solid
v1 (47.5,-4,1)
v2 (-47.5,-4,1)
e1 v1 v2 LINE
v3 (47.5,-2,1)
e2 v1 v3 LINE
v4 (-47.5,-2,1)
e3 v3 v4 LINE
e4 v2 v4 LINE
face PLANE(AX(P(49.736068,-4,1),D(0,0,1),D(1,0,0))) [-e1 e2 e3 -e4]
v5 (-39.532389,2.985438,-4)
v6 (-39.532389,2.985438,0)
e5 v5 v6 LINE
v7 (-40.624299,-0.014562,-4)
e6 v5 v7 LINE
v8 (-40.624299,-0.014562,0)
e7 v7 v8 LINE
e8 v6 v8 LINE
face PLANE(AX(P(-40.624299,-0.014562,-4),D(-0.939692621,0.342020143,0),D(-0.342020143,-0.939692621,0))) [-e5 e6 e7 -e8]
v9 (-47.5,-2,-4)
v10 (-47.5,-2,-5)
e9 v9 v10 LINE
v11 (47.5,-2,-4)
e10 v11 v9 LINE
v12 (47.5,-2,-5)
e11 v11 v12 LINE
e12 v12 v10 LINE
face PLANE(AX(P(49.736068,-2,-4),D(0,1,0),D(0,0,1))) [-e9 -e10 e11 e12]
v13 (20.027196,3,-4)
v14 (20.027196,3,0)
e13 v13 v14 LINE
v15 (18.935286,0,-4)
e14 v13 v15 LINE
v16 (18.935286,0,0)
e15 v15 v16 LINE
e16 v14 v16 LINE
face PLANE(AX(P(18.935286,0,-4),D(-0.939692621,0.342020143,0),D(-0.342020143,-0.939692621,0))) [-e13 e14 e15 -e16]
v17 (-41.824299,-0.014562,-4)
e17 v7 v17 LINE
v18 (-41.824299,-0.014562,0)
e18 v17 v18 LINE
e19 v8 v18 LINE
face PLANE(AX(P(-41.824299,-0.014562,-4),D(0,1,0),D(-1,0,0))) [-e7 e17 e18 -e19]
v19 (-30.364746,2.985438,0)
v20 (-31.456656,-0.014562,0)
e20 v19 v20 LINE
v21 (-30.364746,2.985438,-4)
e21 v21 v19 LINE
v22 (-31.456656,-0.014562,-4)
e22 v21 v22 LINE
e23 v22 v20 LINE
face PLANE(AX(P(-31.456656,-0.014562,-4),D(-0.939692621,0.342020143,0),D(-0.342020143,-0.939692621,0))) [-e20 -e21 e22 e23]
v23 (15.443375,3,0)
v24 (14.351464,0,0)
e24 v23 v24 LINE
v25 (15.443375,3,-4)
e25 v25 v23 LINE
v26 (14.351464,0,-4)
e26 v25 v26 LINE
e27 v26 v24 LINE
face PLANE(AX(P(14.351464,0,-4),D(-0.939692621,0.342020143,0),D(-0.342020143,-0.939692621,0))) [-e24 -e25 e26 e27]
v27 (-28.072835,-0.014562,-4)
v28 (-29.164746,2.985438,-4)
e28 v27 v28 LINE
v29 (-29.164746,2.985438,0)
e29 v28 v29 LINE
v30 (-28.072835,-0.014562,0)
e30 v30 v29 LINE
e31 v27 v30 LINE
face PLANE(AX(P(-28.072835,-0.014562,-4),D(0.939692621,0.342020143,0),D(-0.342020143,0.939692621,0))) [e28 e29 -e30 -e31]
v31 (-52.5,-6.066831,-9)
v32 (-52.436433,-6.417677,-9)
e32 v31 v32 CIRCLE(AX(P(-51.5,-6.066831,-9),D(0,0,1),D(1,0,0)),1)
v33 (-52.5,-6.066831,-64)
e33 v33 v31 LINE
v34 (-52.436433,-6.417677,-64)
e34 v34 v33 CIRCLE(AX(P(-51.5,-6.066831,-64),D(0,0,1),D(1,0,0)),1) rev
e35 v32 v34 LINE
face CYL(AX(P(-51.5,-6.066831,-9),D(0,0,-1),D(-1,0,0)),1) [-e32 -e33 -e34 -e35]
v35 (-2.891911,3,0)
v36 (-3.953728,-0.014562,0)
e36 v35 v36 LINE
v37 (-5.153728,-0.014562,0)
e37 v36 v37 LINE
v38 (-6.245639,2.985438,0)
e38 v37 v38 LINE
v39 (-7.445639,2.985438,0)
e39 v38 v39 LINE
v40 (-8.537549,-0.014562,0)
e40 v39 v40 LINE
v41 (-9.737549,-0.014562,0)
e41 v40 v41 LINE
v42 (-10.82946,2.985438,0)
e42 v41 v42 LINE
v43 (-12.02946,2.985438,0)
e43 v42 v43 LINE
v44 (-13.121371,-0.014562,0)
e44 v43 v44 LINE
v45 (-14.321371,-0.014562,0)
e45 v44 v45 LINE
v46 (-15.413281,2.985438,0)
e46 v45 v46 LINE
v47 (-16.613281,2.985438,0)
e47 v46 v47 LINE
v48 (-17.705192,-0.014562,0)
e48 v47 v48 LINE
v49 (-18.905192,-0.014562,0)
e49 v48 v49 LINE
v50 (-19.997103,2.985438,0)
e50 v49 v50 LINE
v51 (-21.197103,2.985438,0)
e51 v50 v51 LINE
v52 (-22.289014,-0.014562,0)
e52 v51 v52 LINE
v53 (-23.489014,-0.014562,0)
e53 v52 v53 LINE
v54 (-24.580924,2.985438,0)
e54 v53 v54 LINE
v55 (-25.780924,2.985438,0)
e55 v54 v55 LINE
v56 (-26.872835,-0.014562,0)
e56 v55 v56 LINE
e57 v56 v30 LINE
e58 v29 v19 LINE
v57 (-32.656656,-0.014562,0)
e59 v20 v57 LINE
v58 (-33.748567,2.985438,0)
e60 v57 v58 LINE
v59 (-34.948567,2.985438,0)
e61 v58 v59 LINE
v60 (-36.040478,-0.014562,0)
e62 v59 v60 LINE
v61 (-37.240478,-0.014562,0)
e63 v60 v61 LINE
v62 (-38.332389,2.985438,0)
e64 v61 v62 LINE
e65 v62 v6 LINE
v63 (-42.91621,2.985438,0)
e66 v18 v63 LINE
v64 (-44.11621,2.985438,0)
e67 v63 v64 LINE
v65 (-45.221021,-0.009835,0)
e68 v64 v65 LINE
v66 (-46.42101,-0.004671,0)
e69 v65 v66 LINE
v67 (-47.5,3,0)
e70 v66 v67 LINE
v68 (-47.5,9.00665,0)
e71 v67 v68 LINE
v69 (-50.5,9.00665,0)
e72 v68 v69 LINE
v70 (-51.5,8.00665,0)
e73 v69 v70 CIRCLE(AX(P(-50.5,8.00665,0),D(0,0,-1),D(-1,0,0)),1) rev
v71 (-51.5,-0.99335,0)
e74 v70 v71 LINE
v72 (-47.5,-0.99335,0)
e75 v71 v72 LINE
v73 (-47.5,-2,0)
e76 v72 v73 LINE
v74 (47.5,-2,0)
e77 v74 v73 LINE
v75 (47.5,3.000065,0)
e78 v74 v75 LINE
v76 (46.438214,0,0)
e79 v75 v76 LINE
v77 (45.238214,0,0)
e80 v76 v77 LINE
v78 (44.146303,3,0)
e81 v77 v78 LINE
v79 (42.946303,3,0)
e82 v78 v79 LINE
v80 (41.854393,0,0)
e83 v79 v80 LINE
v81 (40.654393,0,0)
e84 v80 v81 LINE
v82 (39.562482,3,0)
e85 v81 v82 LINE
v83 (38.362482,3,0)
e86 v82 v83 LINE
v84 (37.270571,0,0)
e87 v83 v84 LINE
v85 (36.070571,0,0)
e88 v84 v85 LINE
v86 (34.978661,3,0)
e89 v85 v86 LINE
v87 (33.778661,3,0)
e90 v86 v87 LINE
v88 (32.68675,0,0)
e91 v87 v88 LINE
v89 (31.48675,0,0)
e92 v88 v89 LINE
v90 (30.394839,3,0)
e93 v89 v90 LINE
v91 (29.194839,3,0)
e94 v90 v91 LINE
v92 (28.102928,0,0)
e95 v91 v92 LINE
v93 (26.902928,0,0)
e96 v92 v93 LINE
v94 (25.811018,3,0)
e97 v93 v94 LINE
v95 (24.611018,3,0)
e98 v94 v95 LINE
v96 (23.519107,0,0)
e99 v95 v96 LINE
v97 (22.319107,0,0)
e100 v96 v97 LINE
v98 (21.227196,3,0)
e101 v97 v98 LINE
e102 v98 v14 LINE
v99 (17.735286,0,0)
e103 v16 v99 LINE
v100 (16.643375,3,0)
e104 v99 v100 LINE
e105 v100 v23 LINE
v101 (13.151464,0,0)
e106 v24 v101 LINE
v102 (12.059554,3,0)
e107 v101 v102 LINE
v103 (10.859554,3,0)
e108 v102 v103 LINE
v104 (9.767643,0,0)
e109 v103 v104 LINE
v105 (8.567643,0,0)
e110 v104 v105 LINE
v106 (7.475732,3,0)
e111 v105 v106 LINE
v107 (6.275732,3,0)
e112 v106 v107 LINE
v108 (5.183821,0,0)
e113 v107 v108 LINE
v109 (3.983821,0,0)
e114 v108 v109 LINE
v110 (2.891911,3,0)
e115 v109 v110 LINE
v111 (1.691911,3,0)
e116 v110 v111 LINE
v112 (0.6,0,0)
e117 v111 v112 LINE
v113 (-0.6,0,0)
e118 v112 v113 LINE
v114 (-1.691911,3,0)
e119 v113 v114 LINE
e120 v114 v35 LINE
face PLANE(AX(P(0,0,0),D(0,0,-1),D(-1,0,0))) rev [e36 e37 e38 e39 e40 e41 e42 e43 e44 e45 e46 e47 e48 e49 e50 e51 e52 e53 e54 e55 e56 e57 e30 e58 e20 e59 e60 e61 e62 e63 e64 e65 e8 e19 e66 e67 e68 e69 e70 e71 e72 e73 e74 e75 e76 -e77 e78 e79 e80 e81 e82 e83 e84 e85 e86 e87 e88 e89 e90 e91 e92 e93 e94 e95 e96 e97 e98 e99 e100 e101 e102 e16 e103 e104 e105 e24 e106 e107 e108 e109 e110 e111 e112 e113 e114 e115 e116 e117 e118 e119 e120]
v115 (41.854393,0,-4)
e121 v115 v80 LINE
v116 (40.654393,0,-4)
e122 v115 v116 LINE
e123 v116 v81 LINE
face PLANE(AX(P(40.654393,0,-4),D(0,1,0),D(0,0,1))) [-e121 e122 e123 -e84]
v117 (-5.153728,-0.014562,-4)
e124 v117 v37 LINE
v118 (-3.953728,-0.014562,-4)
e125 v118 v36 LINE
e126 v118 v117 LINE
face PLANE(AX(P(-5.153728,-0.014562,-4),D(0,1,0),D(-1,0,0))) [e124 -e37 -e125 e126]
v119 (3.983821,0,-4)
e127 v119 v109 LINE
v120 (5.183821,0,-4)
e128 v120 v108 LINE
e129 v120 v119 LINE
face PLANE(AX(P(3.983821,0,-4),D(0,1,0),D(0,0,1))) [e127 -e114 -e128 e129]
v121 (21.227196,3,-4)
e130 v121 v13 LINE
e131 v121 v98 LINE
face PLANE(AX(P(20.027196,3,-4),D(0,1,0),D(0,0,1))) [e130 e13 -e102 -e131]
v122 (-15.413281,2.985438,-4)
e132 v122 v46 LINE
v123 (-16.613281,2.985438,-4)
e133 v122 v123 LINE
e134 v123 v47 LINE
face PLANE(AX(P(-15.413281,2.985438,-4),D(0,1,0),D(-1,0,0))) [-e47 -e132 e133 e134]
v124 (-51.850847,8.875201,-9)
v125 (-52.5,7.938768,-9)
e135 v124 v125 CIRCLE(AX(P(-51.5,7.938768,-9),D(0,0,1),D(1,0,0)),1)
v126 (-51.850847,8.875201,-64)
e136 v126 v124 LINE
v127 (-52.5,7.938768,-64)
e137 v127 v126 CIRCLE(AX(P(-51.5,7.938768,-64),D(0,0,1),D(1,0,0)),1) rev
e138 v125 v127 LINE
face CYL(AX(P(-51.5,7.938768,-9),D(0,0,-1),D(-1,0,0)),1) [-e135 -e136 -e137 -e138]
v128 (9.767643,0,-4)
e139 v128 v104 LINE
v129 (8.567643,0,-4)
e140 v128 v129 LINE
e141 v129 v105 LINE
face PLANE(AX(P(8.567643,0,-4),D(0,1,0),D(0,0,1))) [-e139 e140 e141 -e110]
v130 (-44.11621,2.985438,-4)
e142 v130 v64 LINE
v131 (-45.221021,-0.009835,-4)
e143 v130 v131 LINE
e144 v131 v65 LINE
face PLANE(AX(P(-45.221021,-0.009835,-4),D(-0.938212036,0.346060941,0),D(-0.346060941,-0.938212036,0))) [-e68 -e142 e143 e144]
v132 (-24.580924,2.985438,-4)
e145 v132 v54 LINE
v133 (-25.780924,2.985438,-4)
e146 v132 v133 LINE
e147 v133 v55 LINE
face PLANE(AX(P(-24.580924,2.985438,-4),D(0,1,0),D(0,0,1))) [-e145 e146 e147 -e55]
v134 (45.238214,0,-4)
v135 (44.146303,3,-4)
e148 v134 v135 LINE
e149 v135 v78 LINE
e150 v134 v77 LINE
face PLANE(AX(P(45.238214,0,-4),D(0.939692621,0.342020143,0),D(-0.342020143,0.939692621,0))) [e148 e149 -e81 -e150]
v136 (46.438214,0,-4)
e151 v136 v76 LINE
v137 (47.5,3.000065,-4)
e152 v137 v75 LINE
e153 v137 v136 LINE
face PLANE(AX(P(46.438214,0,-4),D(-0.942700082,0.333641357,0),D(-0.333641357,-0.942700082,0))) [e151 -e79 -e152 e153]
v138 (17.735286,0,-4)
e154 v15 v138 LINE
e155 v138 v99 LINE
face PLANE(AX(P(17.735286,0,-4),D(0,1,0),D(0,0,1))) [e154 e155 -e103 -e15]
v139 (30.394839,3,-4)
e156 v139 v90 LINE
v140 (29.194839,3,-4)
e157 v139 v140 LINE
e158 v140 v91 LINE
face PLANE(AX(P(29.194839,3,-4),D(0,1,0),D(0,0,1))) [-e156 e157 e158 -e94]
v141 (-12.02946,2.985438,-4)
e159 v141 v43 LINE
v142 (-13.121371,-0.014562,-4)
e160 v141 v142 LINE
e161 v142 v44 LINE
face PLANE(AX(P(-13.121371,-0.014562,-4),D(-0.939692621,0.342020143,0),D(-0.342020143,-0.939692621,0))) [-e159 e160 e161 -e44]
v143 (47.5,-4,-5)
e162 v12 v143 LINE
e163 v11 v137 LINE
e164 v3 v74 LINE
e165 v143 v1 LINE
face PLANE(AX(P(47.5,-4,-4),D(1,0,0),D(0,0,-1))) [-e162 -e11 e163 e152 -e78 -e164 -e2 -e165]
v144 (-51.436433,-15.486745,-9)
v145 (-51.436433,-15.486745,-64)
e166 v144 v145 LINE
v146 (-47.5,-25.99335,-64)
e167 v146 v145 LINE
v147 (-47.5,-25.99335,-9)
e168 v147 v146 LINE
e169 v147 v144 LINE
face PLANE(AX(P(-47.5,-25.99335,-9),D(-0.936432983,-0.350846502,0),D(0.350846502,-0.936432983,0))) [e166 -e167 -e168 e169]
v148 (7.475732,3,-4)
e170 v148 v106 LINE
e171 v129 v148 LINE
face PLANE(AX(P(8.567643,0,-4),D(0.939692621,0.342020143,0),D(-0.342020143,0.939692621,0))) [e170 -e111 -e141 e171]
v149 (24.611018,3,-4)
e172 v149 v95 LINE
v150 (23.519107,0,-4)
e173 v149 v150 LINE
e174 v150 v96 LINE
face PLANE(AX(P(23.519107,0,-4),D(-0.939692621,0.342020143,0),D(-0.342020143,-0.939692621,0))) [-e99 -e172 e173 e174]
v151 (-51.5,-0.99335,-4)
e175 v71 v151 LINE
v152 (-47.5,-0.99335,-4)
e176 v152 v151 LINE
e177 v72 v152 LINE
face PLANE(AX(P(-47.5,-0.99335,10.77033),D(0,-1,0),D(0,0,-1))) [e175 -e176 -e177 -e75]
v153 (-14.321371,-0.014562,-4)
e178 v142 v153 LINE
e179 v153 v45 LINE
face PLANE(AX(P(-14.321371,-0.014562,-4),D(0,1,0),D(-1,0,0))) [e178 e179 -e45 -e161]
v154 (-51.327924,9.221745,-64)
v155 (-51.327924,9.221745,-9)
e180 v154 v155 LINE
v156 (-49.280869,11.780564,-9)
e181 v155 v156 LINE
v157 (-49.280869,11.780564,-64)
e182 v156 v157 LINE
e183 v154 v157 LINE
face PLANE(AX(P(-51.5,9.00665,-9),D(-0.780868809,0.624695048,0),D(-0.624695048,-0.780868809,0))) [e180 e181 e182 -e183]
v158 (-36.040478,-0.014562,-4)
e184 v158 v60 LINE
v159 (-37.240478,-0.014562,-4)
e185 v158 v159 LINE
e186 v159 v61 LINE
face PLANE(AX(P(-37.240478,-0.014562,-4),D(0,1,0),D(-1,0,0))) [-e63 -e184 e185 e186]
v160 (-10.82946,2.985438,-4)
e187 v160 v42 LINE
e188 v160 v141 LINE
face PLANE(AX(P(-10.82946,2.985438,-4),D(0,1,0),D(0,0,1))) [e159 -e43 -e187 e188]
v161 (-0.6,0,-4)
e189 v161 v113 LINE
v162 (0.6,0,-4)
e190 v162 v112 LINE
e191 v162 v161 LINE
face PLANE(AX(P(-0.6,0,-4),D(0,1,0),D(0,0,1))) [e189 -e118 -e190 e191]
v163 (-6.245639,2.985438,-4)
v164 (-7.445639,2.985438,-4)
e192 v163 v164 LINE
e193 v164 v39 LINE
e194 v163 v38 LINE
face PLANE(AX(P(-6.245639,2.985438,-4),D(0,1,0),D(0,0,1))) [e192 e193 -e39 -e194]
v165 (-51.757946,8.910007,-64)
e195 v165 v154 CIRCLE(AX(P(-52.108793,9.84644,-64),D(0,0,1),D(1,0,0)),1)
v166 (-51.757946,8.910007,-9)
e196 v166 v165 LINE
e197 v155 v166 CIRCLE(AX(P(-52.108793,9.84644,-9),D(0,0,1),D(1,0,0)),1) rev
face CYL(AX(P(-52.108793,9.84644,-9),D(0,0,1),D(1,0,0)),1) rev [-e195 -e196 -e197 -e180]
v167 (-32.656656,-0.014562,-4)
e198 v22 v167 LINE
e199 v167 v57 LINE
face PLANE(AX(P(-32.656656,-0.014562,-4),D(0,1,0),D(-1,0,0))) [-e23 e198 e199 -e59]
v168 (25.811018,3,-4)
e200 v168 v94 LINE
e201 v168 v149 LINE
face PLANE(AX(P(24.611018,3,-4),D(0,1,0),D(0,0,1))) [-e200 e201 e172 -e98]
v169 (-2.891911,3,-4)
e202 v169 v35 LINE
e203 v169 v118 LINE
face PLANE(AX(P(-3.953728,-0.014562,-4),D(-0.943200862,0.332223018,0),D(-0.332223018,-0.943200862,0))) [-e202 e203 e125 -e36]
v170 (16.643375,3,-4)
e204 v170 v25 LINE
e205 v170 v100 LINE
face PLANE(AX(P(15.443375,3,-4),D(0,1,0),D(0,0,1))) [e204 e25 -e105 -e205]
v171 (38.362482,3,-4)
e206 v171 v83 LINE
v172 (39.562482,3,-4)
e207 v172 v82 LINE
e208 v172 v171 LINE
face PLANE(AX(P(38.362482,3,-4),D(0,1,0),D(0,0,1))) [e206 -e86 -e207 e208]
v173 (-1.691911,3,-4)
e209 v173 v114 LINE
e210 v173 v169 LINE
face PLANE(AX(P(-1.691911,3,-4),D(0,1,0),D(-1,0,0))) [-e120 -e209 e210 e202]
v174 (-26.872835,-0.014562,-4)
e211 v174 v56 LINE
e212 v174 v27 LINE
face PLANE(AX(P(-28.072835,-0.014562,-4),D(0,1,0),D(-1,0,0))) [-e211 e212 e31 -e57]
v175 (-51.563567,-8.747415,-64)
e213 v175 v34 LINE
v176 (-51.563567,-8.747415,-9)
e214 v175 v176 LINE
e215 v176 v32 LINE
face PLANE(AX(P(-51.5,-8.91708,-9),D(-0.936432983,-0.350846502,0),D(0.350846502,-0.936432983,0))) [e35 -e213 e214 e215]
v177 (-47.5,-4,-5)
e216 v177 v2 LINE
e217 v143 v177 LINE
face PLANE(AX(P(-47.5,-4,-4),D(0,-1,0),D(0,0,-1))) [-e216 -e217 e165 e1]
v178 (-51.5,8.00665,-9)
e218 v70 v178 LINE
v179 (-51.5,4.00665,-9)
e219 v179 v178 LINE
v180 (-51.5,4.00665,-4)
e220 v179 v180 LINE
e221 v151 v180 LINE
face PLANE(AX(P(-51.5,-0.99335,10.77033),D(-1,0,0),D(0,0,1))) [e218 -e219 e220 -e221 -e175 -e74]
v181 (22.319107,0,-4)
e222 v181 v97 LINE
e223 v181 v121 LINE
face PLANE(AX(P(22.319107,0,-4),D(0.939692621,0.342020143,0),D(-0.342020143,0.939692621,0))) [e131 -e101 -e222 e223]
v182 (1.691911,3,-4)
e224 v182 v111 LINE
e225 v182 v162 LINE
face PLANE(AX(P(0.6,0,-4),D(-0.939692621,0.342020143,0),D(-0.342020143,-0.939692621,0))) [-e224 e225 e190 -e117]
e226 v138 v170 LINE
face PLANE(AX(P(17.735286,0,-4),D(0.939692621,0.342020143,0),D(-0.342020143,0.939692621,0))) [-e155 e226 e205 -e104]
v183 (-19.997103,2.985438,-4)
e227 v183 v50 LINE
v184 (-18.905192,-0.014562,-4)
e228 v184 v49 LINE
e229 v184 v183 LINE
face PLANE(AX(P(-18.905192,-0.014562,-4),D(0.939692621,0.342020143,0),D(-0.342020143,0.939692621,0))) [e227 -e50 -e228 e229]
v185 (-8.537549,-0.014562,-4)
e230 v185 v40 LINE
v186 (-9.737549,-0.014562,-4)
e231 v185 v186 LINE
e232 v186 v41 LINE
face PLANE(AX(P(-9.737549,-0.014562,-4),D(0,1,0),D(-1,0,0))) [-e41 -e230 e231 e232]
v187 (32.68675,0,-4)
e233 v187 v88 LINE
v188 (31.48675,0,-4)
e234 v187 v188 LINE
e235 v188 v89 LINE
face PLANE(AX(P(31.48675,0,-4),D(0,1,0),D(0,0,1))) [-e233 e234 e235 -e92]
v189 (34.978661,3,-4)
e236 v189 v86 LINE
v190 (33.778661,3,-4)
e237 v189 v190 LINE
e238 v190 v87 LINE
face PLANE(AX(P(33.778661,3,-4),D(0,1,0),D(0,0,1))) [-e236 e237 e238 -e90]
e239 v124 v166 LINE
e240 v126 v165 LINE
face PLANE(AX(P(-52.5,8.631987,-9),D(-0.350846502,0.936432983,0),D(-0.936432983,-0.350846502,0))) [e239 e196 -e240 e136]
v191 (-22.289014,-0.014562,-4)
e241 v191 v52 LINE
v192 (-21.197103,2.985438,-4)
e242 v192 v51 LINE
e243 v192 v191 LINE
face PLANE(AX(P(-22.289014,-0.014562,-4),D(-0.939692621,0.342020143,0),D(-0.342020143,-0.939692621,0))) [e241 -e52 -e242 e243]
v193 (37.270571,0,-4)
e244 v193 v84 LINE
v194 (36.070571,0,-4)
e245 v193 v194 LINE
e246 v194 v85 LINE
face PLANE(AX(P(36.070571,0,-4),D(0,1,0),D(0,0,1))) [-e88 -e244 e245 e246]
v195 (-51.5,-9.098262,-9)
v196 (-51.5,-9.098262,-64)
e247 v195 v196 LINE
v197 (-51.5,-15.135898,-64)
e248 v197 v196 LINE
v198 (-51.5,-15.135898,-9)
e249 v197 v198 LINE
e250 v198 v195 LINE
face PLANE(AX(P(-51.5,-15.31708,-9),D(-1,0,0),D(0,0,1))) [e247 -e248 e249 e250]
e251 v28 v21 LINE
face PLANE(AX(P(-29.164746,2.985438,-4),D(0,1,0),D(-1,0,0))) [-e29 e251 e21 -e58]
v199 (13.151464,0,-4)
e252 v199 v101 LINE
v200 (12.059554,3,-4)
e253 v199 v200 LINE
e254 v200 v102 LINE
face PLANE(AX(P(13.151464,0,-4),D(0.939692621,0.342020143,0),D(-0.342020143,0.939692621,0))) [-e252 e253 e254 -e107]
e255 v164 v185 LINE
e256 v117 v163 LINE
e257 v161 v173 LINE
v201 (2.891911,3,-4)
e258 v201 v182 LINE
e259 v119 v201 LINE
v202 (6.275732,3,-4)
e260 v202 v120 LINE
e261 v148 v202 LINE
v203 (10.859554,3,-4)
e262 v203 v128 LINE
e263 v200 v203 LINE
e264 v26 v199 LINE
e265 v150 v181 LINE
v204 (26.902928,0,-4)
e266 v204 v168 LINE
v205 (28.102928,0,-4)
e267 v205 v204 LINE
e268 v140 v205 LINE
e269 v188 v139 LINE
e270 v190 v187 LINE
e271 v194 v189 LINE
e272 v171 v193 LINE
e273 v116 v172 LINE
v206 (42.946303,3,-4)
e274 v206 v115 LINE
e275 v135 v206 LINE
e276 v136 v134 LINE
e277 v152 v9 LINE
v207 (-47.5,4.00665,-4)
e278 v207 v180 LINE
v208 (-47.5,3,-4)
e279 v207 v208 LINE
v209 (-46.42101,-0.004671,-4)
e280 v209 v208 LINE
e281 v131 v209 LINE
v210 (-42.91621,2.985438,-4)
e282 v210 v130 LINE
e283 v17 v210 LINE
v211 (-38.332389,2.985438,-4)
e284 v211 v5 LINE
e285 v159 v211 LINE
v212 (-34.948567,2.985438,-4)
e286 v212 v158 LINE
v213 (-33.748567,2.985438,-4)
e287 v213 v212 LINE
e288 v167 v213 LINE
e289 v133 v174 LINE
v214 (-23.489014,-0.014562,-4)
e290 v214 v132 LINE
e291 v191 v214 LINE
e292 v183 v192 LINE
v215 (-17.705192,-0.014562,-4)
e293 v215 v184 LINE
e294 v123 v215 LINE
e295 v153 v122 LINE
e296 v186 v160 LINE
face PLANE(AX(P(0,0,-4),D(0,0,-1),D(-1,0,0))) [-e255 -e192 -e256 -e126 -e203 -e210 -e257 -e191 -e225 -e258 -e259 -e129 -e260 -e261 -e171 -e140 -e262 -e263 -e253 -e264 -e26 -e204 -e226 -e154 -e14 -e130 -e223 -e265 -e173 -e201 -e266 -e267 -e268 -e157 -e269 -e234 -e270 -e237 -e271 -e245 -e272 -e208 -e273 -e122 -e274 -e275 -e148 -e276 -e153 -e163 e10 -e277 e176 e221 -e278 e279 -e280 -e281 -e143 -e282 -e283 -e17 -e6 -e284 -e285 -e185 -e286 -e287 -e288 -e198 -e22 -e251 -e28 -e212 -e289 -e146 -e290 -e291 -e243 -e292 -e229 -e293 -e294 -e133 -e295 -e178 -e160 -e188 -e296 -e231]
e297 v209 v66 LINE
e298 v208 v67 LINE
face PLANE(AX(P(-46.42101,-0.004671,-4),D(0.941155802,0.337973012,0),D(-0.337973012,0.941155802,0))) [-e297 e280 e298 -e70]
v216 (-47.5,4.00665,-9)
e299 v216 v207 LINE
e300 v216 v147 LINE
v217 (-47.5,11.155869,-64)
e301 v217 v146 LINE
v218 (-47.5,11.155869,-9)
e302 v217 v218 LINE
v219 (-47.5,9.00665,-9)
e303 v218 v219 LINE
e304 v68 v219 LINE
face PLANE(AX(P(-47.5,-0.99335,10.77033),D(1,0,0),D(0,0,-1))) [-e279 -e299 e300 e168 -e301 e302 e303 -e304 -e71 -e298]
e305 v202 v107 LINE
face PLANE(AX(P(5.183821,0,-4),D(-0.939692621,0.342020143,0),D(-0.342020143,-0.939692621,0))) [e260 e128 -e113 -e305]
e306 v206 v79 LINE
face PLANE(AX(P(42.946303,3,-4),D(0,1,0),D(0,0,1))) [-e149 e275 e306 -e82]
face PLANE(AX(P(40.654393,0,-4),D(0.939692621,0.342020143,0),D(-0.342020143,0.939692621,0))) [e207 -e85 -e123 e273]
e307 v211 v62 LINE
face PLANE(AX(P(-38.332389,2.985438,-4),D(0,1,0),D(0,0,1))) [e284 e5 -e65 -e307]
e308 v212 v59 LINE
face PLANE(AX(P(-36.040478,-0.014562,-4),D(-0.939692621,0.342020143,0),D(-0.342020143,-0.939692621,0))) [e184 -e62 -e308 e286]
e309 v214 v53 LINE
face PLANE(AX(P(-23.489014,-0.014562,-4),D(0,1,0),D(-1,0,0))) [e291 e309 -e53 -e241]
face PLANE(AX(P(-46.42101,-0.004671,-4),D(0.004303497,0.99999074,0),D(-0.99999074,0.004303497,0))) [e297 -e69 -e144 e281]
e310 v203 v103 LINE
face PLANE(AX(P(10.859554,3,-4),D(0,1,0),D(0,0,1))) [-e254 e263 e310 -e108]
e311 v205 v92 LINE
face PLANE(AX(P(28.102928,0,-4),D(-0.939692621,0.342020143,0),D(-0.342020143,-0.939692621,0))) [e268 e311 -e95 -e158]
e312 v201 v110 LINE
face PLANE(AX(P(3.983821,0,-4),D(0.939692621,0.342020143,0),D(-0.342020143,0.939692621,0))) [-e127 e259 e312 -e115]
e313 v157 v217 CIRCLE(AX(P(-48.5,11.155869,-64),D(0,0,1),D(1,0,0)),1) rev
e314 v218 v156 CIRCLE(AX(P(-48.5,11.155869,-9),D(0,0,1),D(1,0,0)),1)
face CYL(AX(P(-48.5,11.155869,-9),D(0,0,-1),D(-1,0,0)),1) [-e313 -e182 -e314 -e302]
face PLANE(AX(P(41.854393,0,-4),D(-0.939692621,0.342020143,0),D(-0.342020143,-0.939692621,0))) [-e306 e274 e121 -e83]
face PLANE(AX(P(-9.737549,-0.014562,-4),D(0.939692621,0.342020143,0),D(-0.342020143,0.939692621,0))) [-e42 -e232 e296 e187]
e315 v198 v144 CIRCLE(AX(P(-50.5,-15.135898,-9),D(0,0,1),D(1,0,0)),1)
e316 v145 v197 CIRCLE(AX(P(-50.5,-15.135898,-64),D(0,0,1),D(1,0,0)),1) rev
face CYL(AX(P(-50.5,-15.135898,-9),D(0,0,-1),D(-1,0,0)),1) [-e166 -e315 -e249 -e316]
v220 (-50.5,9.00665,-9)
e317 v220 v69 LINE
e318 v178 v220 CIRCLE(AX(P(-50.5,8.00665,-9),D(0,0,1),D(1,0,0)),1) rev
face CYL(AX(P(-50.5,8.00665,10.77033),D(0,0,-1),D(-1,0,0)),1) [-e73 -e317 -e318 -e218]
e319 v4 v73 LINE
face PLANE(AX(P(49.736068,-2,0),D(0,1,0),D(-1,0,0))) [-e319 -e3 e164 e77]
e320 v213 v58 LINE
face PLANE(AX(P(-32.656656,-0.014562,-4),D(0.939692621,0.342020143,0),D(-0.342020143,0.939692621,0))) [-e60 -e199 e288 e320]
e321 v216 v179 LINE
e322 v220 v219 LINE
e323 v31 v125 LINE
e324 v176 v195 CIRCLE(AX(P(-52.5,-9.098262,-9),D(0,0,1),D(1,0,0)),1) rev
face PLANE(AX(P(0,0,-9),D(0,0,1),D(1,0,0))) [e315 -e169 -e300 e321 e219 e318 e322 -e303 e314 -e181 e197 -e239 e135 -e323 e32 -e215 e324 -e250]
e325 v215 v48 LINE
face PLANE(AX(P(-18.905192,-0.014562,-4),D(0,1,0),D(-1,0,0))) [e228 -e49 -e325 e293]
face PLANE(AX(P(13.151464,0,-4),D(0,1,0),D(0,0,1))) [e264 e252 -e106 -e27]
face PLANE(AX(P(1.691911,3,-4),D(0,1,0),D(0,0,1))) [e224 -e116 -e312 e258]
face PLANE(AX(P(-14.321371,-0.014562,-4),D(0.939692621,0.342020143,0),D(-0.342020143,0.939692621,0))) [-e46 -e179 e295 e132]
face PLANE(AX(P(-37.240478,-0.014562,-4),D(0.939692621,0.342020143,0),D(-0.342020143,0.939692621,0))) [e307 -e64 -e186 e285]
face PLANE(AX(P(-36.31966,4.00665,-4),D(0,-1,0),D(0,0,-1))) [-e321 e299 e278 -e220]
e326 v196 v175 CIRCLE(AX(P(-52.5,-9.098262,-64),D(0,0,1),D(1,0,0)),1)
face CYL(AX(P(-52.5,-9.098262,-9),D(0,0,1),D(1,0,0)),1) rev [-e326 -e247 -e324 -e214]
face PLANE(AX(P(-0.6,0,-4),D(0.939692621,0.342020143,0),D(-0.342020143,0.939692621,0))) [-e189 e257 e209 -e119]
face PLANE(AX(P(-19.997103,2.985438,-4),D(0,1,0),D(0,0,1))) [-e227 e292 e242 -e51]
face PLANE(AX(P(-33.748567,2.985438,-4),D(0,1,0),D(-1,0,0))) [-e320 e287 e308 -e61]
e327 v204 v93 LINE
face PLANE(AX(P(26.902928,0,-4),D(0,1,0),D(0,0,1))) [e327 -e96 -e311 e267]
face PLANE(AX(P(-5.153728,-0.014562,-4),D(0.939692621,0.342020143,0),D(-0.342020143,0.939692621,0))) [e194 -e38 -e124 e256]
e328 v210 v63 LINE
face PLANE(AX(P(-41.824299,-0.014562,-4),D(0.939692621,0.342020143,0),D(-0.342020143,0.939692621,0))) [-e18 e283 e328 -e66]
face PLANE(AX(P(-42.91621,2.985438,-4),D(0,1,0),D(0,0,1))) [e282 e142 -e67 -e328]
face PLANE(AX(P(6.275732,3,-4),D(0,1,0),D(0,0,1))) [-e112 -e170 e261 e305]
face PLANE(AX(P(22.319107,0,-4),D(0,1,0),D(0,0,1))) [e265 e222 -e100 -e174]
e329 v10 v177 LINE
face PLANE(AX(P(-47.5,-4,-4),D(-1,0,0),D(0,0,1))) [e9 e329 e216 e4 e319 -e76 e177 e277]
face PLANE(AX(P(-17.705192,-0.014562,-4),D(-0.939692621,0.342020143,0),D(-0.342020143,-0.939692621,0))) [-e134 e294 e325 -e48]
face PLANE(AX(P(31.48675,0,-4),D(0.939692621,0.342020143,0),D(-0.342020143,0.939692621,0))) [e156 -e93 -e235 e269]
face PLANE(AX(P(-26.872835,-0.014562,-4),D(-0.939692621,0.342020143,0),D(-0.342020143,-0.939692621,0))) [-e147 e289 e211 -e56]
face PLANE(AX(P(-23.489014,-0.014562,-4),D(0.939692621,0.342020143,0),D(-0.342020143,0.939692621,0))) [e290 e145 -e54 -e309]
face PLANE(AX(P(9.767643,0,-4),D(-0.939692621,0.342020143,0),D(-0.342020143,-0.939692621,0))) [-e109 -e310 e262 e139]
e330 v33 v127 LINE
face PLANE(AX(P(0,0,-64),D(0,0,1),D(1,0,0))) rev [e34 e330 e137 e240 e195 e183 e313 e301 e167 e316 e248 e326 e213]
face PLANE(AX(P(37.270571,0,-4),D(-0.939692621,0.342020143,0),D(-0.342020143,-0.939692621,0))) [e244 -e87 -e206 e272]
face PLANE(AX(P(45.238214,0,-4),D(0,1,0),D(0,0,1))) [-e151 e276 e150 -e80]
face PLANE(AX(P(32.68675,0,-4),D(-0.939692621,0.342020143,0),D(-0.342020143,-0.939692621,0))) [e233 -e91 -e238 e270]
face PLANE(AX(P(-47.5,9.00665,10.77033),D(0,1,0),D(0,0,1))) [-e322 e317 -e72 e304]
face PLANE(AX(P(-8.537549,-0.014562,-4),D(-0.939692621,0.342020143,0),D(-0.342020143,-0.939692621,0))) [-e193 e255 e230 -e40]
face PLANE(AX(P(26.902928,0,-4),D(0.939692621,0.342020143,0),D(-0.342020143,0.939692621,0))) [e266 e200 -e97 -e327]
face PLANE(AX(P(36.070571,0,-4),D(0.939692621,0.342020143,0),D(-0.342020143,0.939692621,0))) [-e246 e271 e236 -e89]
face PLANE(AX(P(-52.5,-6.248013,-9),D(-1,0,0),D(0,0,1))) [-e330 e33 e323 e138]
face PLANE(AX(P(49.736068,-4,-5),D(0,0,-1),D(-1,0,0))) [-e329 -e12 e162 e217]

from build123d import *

# Parameters (mm, degrees)
BOSS_EXTRU_2_DEPTH      = 4
ESQUISSE5_W             = 1
ESQUISSE5_H             = 2
BOSS_EXTRU_3_DEPTH      = 95
ESQUISSE6_W             = 4
ESQUISSE6_H             = 10
BOSS_EXTRU_4_DEPTH      = 4
ESQUISSE7_W             = 10
ESQUISSE7_H             = 5
BOSS_EXTRU_5_DEPTH      = 4
BOSS_EXTRU_6_DEPTH      = 50
BOSS_EXTRU_6_DEPTH_BACK = 5
CONG_1_R                = 1
CONG_2_R                = 1


with BuildPart() as part:
    # Esquisse2 → Boss.-Extru.2 (new body)
    with BuildSketch(Plane.XY):
        Polygon((-0.6, 0), (0.6, 0), (1.691910703, 3), (2.891910703, 3), (3.983821406, 0), (5.183821406, 0), (6.275732108, 3), (7.475732108, 3), (8.567642811, 0), (9.767642811, 0), (10.859553514, 3), (12.059553514, 3), (13.151464217, 0), (14.351464217, 0), (15.44337492, 3), (16.64337492, 3), (17.735285622, 0), (18.935285622, 0), (20.027196325, 3), (21.227196325, 3), (22.319107028, 0), (23.519107028, 0), (24.611017731, 3), (25.811017731, 3), (26.902928434, 0), (28.102928434, 0), (29.194839136, 3), (30.394839136, 3), (31.486749839, 0), (32.686749839, 0), (33.778660542, 3), (34.978660542, 3), (36.070571245, 0), (37.270571245, 0), (38.362481948, 3), (39.562481948, 3), (40.65439265, 0), (41.85439265, 0), (42.946303353, 3), (44.146303353, 3), (45.238214056, 0), (46.438214056, 0), (47.5, 3.000064821), (47.5, -4), (-47.5, -4), (-47.5, 3), (-46.4210099, -0.004671254), (-45.221021012, -0.009835451), (-44.116209929, 2.985437734), (-42.916209929, 2.985437734), (-41.824299226, -0.014562266), (-40.624299226, -0.014562266), (-39.532388523, 2.985437734), (-38.332388523, 2.985437734), (-37.24047782, -0.014562266), (-36.04047782, -0.014562266), (-34.948567118, 2.985437734), (-33.748567118, 2.985437734), (-32.656656415, -0.014562266), (-31.456656415, -0.014562266), (-30.364745712, 2.985437734), (-29.164745712, 2.985437734), (-28.072835009, -0.014562266), (-26.872835009, -0.014562266), (-25.780924306, 2.985437734), (-24.580924306, 2.985437734), (-23.489013604, -0.014562266), (-22.289013604, -0.014562266), (-21.197102901, 2.985437734), (-19.997102901, 2.985437734), (-18.905192198, -0.014562266), (-17.705192198, -0.014562266), (-16.613281495, 2.985437734), (-15.413281495, 2.985437734), (-14.321370793, -0.014562266), (-13.121370793, -0.014562266), (-12.02946009, 2.985437734), (-10.82946009, 2.985437734), (-9.737549387, -0.014562266), (-8.537549387, -0.014562266), (-7.445638684, 2.985437734), (-6.245638684, 2.985437734), (-5.153727981, -0.014562266), (-3.953727981, -0.014562266), (-2.891910703, 3), (-1.691910703, 3), align=None)
    extrude(amount=-BOSS_EXTRU_2_DEPTH)

    # Esquisse5 → Boss.-Extru.3 (add)
    with BuildSketch(Plane.ZY.offset(47.5)):
        with Locations((0.5, -3)):
            Rectangle(ESQUISSE5_W, ESQUISSE5_H)
        with Locations((-4.5, -3)):
            Rectangle(ESQUISSE5_W, ESQUISSE5_H)
    extrude(amount=-BOSS_EXTRU_3_DEPTH)

    # Esquisse6 → Boss.-Extru.4 (add)
    with BuildSketch(Plane(origin=(0, 0, -4), x_dir=(-1, 0, 0), z_dir=(0, 0, -1))):
        with Locations((49.5, 4.006649999)):
            Rectangle(ESQUISSE6_W, ESQUISSE6_H)
    extrude(amount=-BOSS_EXTRU_4_DEPTH)

    # Esquisse7 → Boss.-Extru.5 (add)
    with BuildSketch(Plane.ZY.offset(51.5)):
        with Locations((-9, 6.506649999)):
            Rectangle(ESQUISSE7_W, ESQUISSE7_H)
    extrude(amount=-BOSS_EXTRU_5_DEPTH)

    # Esquisse8 → Boss.-Extru.6 (add, two sides: drawn at the far end of the back side and taken through both)
    with BuildSketch(Plane(origin=(0, 0, -14), x_dir=(-1, 0, 0), z_dir=(0, 0, -1)).offset(-BOSS_EXTRU_6_DEPTH_BACK)):
        Polygon((47.5, 14.006649999), (47.5, -25.993350001), (51.5, -15.317080155), (51.5, -8.917080155), (52.5, -6.248012693), (52.5, 8.631987307), (51.5, 9.006649999), align=None)
    extrude(amount=BOSS_EXTRU_6_DEPTH + BOSS_EXTRU_6_DEPTH_BACK)

    # Congé1
    # the kernel refuses this fillet: 1 mm, written as the material it adds along each edge
    with BuildSketch(Plane(origin=(-51.5, 9.006649999, -9), x_dir=(0.6246950475544211, 0.7808688094430328, 0), z_dir=(0, 0, -1))) as cong_1_piece_1:
        with BuildLine():
            CenterArc((CONG_1_R * 0.275456143741, -CONG_1_R), CONG_1_R, 90, 30.801092038)
            Line((-CONG_1_R * 0.236603092518, -CONG_1_R * 0.141049862587), (0, 0))
            Line((0, 0), (CONG_1_R * 0.275456143741, 0))
        make_face()
    extrude(amount=55)
    with BuildSketch(Plane(origin=(-51.5, -8.917080155, -9), x_dir=(-0.35084650222761954, 0.9364329831197985, 0), z_dir=(0, 0, -1))) as cong_1_piece_2:
        with BuildLine():
            CenterArc((CONG_1_R * 0.18118184584, -CONG_1_R), CONG_1_R, 90, 20.539099708)
            Line((-CONG_1_R * 0.169664656387, -CONG_1_R * 0.0635670168802), (0, 0))
            Line((0, 0), (CONG_1_R * 0.18118184584, 0))
        make_face()
    extrude(amount=55)
    # the kernel refuses this fillet: 1 mm, written as the material it takes off along each edge
    with BuildSketch(Plane(origin=(-47.5, 14.006649999, -71.126952648), x_dir=(0, -1, 0), z_dir=(0, 0, 1))) as cong_1_2_piece_1:
        with BuildLine():
            CenterArc((CONG_1_R * 2.85078105936, -CONG_1_R), CONG_1_R, 90, 141.340191746)
            Line((CONG_1_R * 2.2260860118, -CONG_1_R * 1.78086880944), (0, 0))
            Line((0, 0), (CONG_1_R * 2.85078105936, 0))
        make_face()
    extrude(amount=69.253905297, mode=Mode.SUBTRACT)
    with BuildSketch(Plane(origin=(-52.5, 8.631987307, -65.733048465), x_dir=(0.9364329831198017, 0.35084650222761105, 0), z_dir=(0, 0, 1))) as cong_1_2_piece_2:
        with BuildLine():
            CenterArc((CONG_1_R * 0.693219386196, -CONG_1_R), CONG_1_R, 90, 69.460900292)
            Line((-CONG_1_R * 0.243213596923, -CONG_1_R * 0.649153497772), (0, 0))
            Line((0, 0), (CONG_1_R * 0.693219386196, 0))
        make_face()
    extrude(amount=58.466096931, mode=Mode.SUBTRACT)
    with BuildSketch(Plane(origin=(-52.5, -6.248012693, -8.547045385), x_dir=(0, 1, 0), z_dir=(0, 0, -1))) as cong_1_2_piece_3:
        with BuildLine():
            CenterArc((CONG_1_R * 0.18118184584, CONG_1_R), CONG_1_R, 249.460900292, 20.539099708)
            Line((-CONG_1_R * 0.169664656387, CONG_1_R * 0.0635670168802), (0, 0))
            Line((0, 0), (CONG_1_R * 0.18118184584, 0))
        make_face()
    extrude(amount=55.905909229, mode=Mode.SUBTRACT)
    with BuildSketch(Plane(origin=(-51.5, -15.317080155, -8.547045385), x_dir=(0.35084650222762276, -0.9364329831197973, 0), z_dir=(0, 0, -1))) as cong_1_2_piece_4:
        with BuildLine():
            CenterArc((CONG_1_R * 0.18118184584, -CONG_1_R), CONG_1_R, 90, 20.539099708)
            Line((-CONG_1_R * 0.169664656387, -CONG_1_R * 0.0635670168802), (0, 0))
            Line((0, 0), (CONG_1_R * 0.18118184584, 0))
        make_face()
    extrude(amount=55.905909229, mode=Mode.SUBTRACT)

    # Congé2
    cong_2_edges = [part.edges().sort_by_distance(p)[0] for p in [
        (-51.5, 9.006649999, -4.5),
    ]]
    fillet(cong_2_edges, radius=CONG_2_R)


solid = part.part
